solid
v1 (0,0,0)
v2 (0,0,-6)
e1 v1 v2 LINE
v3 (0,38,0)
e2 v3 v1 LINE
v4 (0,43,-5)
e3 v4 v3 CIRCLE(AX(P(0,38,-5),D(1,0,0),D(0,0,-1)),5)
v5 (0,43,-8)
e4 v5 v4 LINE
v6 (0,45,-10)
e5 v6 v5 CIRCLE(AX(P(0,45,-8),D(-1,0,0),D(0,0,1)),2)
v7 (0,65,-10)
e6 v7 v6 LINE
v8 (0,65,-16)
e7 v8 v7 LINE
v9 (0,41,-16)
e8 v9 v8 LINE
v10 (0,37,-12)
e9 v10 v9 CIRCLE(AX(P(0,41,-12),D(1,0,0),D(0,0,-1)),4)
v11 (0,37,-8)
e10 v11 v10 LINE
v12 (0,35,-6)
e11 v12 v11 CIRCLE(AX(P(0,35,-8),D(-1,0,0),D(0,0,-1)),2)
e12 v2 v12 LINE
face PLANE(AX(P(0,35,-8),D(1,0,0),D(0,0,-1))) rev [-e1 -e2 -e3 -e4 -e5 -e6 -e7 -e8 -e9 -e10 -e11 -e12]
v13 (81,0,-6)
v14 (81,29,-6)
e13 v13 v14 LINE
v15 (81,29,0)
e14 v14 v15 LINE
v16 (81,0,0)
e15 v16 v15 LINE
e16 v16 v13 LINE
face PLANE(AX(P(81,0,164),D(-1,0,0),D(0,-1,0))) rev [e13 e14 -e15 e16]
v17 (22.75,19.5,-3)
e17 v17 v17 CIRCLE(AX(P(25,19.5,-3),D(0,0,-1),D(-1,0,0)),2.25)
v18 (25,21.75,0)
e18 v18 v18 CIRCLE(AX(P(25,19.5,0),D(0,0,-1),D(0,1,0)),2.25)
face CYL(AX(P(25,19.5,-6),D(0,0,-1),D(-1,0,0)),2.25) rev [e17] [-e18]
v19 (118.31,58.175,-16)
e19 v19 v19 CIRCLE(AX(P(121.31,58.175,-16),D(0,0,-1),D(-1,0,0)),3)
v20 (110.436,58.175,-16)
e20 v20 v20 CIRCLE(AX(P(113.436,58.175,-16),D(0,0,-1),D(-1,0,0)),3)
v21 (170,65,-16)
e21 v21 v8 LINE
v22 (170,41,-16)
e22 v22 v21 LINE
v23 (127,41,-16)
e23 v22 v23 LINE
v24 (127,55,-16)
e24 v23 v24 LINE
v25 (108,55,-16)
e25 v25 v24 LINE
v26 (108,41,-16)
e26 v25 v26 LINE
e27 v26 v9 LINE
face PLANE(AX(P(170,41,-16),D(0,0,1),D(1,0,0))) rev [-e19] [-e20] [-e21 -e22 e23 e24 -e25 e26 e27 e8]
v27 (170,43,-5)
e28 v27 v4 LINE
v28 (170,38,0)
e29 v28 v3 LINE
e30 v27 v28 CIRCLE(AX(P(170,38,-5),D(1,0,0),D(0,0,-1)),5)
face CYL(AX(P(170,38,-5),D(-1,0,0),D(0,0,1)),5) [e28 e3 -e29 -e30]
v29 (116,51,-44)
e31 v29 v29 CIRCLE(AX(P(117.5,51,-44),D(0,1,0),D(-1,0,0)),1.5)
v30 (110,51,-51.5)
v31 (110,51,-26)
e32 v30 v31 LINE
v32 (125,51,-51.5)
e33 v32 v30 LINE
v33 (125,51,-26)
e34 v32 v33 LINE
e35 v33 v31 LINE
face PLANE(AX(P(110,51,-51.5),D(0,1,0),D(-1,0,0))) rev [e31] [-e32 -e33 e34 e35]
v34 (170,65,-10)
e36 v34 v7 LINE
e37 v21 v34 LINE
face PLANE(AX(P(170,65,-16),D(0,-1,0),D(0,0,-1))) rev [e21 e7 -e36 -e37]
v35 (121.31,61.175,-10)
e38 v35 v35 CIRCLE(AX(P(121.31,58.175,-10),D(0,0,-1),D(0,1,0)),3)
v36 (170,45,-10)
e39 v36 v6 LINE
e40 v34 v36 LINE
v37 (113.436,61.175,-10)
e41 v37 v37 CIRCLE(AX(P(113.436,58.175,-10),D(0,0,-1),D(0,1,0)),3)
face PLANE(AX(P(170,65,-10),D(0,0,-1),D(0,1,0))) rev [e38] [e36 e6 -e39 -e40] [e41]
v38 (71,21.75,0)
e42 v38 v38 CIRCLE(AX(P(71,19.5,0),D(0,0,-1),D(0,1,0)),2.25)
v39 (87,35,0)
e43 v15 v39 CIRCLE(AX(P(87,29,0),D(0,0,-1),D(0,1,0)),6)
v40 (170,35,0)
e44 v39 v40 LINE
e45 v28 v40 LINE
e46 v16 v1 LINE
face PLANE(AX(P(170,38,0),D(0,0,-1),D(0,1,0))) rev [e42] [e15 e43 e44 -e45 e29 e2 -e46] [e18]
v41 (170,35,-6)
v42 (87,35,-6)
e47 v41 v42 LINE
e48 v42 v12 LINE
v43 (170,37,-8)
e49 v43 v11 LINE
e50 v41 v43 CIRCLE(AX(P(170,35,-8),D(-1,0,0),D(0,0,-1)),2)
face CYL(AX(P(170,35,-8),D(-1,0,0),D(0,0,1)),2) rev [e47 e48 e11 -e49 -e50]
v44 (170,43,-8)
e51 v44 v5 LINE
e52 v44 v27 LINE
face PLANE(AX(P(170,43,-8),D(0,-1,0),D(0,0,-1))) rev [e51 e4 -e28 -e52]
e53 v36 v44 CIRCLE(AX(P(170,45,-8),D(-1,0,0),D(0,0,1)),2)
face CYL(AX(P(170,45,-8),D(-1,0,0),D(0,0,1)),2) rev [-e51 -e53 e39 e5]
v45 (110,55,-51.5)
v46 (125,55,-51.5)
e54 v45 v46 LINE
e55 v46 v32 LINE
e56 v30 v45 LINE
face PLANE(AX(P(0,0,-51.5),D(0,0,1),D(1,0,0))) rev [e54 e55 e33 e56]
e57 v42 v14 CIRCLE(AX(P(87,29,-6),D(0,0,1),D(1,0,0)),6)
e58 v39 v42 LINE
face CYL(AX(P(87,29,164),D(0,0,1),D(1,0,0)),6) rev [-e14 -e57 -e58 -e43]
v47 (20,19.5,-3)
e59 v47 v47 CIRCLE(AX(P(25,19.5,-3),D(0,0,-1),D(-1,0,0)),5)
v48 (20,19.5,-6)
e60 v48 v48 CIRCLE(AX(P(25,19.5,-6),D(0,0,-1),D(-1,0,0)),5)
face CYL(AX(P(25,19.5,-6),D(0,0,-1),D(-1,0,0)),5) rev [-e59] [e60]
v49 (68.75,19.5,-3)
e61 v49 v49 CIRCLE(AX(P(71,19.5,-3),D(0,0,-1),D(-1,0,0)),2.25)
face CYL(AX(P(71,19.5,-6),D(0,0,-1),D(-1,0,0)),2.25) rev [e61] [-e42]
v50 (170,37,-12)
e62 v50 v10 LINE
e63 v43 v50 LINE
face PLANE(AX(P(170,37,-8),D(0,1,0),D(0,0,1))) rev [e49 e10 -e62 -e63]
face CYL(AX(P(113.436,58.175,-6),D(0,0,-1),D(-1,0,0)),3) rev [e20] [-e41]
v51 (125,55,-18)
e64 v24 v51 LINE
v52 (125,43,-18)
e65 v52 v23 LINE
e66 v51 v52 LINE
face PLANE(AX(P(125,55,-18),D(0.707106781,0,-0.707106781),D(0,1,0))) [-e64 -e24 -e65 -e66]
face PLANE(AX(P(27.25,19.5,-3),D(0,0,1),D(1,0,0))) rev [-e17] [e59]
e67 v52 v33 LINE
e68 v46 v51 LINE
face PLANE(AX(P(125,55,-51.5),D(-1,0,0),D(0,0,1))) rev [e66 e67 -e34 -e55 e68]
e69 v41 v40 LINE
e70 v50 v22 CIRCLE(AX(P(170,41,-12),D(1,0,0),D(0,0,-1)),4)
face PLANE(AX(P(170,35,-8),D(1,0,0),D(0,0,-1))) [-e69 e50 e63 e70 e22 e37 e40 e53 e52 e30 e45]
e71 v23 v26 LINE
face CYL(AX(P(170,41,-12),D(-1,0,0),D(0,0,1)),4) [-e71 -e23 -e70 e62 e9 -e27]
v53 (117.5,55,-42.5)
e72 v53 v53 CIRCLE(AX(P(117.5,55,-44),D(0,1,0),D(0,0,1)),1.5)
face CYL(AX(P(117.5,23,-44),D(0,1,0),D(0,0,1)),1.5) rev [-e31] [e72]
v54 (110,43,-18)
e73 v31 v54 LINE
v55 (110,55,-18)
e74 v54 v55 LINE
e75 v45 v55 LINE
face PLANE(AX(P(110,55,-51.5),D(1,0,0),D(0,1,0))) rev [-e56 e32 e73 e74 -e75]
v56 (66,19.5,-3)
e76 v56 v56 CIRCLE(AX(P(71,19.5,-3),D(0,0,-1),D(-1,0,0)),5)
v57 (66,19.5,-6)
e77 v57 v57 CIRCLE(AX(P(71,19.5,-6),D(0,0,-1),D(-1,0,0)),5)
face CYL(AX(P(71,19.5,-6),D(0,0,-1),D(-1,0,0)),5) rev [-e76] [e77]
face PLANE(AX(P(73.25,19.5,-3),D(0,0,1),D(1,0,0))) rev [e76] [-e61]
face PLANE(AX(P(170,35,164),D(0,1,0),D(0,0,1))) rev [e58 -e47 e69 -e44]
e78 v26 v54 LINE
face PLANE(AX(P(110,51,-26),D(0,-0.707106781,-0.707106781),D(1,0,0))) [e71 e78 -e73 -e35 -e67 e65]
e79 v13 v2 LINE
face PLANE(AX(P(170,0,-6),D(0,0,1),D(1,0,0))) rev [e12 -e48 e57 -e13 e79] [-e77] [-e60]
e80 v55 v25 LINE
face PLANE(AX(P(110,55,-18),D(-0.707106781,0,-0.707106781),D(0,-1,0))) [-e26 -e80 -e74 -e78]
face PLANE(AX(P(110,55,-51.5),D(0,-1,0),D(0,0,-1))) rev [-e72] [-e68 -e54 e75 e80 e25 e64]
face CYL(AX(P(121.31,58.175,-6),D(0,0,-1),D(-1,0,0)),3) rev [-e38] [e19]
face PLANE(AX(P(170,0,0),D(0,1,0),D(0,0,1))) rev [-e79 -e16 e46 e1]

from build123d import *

# Parameters (mm, degrees)
ESTRUSIONE_ESTRUSIONE1_DEPTH                         = 170
FORO_LAMATO_PER_BULLONE_M5_A_TESTA_ESAGO_D           = 4.5
FORO_LAMATO_PER_BULLONE_M5_A_TESTA_ESAGO_DEPTH       = 30
FORO_LAMATO_PER_BULLONE_M5_A_TESTA_ESAGO_CBORE_D     = 10
FORO_LAMATO_PER_BULLONE_M5_A_TESTA_ESAGO_CBORE_DEPTH = 3
FORO_LAMATO_PER_BULLONE_M5_A_TESTA_ESAGO_TIP         = 1.351936393
SCHIZZO4_W                                           = 89
SCHIZZO4_H                                           = 35
TAGLIO_ESTRUSIONE1_DEPTH                             = 170
RACCORDO1_R                                          = 6
SCHIZZO5_W                                           = 15
SCHIZZO5_H                                           = 4
ESTRUSIONE_ESTRUSIONE2_DEPTH                         = 35.5
SCHIZZO6_R                                           = 1.5
TAGLIO_ESTRUSIONE2_DEPTH                             = 32
SCHIZZO7_R                                           = 3
TAGLIO_ESTRUSIONE3_DEPTH                             = 10
SMUSSO1_SIZE                                         = 10
SMUSSO2_SIZE                                         = 2


with BuildPart() as part:
    # Schizzo1 → Estrusione-Estrusione1 (new body)
    with BuildSketch(Plane(origin=(0, 0, 0), x_dir=(0, 0, -1), z_dir=(1, 0, 0))):
        with BuildLine():
            Line((0, 0), (6, 0))
            Line((6, 0), (6, 35))
            ThreePointArc((6, 35), (6.585786438, 36.414213562), (8, 37))
            Line((8, 37), (12, 37))
            ThreePointArc((12, 37), (14.828427125, 38.171572875), (16, 41))
            Line((16, 41), (16, 65))
            Line((16, 65), (10, 65))
            Line((10, 65), (10, 45))
            ThreePointArc((10, 45), (9.414213562, 43.585786438), (8, 43))
            Line((8, 43), (5, 43))
            ThreePointArc((5, 43), (1.464466094, 41.535533906), (0, 38))
            Line((0, 38), (0, 0))
        make_face()
    extrude(amount=ESTRUSIONE_ESTRUSIONE1_DEPTH)

    # Foro lamato per Bullone M5 a testa esagonale-1
    with Locations(Plane(origin=(0, 0, -6), x_dir=(-1, 0, 0), z_dir=(0, 0, -1))):
        with Locations((-25, 19.5), (-71, 19.5)):
            CounterBoreHole(FORO_LAMATO_PER_BULLONE_M5_A_TESTA_ESAGO_D / 2, FORO_LAMATO_PER_BULLONE_M5_A_TESTA_ESAGO_CBORE_D / 2, FORO_LAMATO_PER_BULLONE_M5_A_TESTA_ESAGO_CBORE_DEPTH, depth=FORO_LAMATO_PER_BULLONE_M5_A_TESTA_ESAGO_DEPTH)
            with Locations((0, 0, -(FORO_LAMATO_PER_BULLONE_M5_A_TESTA_ESAGO_DEPTH + FORO_LAMATO_PER_BULLONE_M5_A_TESTA_ESAGO_TIP / 2))):  # 118° drill point
                Cone(0, FORO_LAMATO_PER_BULLONE_M5_A_TESTA_ESAGO_D / 2, FORO_LAMATO_PER_BULLONE_M5_A_TESTA_ESAGO_TIP, mode=Mode.SUBTRACT)

    # Schizzo4 → Taglio-Estrusione1 (cut)
    with BuildSketch(Plane(origin=(0, 0, -6), x_dir=(-1, 0, 0), z_dir=(0, 0, -1))):
        with Locations((-125.5, 17.5)):
            Rectangle(SCHIZZO4_W, SCHIZZO4_H)
    extrude(amount=-TAGLIO_ESTRUSIONE1_DEPTH, mode=Mode.SUBTRACT)

    # Raccordo1
    raccordo1_edges = [part.edges().sort_by_distance(p)[0] for p in [
        (81, 35, -3),
    ]]
    fillet(raccordo1_edges, radius=RACCORDO1_R)

    # Schizzo5 → Estrusione-Estrusione2 (add)
    with BuildSketch(Plane(origin=(0, 0, -16), x_dir=(-1, 0, 0), z_dir=(0, 0, -1))):
        with Locations((-117.5, 53)):
            Rectangle(SCHIZZO5_W, SCHIZZO5_H)
    extrude(amount=ESTRUSIONE_ESTRUSIONE2_DEPTH)

    # Schizzo6 → Taglio-Estrusione2 (cut)
    with BuildSketch(Plane(origin=(0, 55, 0), x_dir=(1, 0, 0), z_dir=(0, 1, 0))):
        with Locations(Location((117.5, 44, 0), (0, 0, 270))):
            Circle(SCHIZZO6_R)
    extrude(amount=-TAGLIO_ESTRUSIONE2_DEPTH, mode=Mode.SUBTRACT)

    # Schizzo7 → Taglio-Estrusione3 (cut)
    with BuildSketch(Plane(origin=(0, 0, -16), x_dir=(-1, 0, 0), z_dir=(0, 0, -1))):
        with Locations((-121.31, 58.175)):
            Circle(SCHIZZO7_R)
        with Locations((-113.436, 58.175)):
            Circle(SCHIZZO7_R)
    extrude(amount=-TAGLIO_ESTRUSIONE3_DEPTH, mode=Mode.SUBTRACT)

    # Smusso1
    smusso1_edges = [part.edges().sort_by_distance(p)[0] for p in [
        (117.5, 51, -16),
    ]]
    chamfer(smusso1_edges, length=SMUSSO1_SIZE - 0.0001)  # a hair under: the kernel refuses the full size

    # Smusso2
    smusso2_edges = [part.edges().sort_by_distance(p)[0] for p in [
        (110, 48.00005, -16),
        (125, 48.00005, -16),
    ]]
    chamfer(smusso2_edges, length=SMUSSO2_SIZE)


solid = part.part
